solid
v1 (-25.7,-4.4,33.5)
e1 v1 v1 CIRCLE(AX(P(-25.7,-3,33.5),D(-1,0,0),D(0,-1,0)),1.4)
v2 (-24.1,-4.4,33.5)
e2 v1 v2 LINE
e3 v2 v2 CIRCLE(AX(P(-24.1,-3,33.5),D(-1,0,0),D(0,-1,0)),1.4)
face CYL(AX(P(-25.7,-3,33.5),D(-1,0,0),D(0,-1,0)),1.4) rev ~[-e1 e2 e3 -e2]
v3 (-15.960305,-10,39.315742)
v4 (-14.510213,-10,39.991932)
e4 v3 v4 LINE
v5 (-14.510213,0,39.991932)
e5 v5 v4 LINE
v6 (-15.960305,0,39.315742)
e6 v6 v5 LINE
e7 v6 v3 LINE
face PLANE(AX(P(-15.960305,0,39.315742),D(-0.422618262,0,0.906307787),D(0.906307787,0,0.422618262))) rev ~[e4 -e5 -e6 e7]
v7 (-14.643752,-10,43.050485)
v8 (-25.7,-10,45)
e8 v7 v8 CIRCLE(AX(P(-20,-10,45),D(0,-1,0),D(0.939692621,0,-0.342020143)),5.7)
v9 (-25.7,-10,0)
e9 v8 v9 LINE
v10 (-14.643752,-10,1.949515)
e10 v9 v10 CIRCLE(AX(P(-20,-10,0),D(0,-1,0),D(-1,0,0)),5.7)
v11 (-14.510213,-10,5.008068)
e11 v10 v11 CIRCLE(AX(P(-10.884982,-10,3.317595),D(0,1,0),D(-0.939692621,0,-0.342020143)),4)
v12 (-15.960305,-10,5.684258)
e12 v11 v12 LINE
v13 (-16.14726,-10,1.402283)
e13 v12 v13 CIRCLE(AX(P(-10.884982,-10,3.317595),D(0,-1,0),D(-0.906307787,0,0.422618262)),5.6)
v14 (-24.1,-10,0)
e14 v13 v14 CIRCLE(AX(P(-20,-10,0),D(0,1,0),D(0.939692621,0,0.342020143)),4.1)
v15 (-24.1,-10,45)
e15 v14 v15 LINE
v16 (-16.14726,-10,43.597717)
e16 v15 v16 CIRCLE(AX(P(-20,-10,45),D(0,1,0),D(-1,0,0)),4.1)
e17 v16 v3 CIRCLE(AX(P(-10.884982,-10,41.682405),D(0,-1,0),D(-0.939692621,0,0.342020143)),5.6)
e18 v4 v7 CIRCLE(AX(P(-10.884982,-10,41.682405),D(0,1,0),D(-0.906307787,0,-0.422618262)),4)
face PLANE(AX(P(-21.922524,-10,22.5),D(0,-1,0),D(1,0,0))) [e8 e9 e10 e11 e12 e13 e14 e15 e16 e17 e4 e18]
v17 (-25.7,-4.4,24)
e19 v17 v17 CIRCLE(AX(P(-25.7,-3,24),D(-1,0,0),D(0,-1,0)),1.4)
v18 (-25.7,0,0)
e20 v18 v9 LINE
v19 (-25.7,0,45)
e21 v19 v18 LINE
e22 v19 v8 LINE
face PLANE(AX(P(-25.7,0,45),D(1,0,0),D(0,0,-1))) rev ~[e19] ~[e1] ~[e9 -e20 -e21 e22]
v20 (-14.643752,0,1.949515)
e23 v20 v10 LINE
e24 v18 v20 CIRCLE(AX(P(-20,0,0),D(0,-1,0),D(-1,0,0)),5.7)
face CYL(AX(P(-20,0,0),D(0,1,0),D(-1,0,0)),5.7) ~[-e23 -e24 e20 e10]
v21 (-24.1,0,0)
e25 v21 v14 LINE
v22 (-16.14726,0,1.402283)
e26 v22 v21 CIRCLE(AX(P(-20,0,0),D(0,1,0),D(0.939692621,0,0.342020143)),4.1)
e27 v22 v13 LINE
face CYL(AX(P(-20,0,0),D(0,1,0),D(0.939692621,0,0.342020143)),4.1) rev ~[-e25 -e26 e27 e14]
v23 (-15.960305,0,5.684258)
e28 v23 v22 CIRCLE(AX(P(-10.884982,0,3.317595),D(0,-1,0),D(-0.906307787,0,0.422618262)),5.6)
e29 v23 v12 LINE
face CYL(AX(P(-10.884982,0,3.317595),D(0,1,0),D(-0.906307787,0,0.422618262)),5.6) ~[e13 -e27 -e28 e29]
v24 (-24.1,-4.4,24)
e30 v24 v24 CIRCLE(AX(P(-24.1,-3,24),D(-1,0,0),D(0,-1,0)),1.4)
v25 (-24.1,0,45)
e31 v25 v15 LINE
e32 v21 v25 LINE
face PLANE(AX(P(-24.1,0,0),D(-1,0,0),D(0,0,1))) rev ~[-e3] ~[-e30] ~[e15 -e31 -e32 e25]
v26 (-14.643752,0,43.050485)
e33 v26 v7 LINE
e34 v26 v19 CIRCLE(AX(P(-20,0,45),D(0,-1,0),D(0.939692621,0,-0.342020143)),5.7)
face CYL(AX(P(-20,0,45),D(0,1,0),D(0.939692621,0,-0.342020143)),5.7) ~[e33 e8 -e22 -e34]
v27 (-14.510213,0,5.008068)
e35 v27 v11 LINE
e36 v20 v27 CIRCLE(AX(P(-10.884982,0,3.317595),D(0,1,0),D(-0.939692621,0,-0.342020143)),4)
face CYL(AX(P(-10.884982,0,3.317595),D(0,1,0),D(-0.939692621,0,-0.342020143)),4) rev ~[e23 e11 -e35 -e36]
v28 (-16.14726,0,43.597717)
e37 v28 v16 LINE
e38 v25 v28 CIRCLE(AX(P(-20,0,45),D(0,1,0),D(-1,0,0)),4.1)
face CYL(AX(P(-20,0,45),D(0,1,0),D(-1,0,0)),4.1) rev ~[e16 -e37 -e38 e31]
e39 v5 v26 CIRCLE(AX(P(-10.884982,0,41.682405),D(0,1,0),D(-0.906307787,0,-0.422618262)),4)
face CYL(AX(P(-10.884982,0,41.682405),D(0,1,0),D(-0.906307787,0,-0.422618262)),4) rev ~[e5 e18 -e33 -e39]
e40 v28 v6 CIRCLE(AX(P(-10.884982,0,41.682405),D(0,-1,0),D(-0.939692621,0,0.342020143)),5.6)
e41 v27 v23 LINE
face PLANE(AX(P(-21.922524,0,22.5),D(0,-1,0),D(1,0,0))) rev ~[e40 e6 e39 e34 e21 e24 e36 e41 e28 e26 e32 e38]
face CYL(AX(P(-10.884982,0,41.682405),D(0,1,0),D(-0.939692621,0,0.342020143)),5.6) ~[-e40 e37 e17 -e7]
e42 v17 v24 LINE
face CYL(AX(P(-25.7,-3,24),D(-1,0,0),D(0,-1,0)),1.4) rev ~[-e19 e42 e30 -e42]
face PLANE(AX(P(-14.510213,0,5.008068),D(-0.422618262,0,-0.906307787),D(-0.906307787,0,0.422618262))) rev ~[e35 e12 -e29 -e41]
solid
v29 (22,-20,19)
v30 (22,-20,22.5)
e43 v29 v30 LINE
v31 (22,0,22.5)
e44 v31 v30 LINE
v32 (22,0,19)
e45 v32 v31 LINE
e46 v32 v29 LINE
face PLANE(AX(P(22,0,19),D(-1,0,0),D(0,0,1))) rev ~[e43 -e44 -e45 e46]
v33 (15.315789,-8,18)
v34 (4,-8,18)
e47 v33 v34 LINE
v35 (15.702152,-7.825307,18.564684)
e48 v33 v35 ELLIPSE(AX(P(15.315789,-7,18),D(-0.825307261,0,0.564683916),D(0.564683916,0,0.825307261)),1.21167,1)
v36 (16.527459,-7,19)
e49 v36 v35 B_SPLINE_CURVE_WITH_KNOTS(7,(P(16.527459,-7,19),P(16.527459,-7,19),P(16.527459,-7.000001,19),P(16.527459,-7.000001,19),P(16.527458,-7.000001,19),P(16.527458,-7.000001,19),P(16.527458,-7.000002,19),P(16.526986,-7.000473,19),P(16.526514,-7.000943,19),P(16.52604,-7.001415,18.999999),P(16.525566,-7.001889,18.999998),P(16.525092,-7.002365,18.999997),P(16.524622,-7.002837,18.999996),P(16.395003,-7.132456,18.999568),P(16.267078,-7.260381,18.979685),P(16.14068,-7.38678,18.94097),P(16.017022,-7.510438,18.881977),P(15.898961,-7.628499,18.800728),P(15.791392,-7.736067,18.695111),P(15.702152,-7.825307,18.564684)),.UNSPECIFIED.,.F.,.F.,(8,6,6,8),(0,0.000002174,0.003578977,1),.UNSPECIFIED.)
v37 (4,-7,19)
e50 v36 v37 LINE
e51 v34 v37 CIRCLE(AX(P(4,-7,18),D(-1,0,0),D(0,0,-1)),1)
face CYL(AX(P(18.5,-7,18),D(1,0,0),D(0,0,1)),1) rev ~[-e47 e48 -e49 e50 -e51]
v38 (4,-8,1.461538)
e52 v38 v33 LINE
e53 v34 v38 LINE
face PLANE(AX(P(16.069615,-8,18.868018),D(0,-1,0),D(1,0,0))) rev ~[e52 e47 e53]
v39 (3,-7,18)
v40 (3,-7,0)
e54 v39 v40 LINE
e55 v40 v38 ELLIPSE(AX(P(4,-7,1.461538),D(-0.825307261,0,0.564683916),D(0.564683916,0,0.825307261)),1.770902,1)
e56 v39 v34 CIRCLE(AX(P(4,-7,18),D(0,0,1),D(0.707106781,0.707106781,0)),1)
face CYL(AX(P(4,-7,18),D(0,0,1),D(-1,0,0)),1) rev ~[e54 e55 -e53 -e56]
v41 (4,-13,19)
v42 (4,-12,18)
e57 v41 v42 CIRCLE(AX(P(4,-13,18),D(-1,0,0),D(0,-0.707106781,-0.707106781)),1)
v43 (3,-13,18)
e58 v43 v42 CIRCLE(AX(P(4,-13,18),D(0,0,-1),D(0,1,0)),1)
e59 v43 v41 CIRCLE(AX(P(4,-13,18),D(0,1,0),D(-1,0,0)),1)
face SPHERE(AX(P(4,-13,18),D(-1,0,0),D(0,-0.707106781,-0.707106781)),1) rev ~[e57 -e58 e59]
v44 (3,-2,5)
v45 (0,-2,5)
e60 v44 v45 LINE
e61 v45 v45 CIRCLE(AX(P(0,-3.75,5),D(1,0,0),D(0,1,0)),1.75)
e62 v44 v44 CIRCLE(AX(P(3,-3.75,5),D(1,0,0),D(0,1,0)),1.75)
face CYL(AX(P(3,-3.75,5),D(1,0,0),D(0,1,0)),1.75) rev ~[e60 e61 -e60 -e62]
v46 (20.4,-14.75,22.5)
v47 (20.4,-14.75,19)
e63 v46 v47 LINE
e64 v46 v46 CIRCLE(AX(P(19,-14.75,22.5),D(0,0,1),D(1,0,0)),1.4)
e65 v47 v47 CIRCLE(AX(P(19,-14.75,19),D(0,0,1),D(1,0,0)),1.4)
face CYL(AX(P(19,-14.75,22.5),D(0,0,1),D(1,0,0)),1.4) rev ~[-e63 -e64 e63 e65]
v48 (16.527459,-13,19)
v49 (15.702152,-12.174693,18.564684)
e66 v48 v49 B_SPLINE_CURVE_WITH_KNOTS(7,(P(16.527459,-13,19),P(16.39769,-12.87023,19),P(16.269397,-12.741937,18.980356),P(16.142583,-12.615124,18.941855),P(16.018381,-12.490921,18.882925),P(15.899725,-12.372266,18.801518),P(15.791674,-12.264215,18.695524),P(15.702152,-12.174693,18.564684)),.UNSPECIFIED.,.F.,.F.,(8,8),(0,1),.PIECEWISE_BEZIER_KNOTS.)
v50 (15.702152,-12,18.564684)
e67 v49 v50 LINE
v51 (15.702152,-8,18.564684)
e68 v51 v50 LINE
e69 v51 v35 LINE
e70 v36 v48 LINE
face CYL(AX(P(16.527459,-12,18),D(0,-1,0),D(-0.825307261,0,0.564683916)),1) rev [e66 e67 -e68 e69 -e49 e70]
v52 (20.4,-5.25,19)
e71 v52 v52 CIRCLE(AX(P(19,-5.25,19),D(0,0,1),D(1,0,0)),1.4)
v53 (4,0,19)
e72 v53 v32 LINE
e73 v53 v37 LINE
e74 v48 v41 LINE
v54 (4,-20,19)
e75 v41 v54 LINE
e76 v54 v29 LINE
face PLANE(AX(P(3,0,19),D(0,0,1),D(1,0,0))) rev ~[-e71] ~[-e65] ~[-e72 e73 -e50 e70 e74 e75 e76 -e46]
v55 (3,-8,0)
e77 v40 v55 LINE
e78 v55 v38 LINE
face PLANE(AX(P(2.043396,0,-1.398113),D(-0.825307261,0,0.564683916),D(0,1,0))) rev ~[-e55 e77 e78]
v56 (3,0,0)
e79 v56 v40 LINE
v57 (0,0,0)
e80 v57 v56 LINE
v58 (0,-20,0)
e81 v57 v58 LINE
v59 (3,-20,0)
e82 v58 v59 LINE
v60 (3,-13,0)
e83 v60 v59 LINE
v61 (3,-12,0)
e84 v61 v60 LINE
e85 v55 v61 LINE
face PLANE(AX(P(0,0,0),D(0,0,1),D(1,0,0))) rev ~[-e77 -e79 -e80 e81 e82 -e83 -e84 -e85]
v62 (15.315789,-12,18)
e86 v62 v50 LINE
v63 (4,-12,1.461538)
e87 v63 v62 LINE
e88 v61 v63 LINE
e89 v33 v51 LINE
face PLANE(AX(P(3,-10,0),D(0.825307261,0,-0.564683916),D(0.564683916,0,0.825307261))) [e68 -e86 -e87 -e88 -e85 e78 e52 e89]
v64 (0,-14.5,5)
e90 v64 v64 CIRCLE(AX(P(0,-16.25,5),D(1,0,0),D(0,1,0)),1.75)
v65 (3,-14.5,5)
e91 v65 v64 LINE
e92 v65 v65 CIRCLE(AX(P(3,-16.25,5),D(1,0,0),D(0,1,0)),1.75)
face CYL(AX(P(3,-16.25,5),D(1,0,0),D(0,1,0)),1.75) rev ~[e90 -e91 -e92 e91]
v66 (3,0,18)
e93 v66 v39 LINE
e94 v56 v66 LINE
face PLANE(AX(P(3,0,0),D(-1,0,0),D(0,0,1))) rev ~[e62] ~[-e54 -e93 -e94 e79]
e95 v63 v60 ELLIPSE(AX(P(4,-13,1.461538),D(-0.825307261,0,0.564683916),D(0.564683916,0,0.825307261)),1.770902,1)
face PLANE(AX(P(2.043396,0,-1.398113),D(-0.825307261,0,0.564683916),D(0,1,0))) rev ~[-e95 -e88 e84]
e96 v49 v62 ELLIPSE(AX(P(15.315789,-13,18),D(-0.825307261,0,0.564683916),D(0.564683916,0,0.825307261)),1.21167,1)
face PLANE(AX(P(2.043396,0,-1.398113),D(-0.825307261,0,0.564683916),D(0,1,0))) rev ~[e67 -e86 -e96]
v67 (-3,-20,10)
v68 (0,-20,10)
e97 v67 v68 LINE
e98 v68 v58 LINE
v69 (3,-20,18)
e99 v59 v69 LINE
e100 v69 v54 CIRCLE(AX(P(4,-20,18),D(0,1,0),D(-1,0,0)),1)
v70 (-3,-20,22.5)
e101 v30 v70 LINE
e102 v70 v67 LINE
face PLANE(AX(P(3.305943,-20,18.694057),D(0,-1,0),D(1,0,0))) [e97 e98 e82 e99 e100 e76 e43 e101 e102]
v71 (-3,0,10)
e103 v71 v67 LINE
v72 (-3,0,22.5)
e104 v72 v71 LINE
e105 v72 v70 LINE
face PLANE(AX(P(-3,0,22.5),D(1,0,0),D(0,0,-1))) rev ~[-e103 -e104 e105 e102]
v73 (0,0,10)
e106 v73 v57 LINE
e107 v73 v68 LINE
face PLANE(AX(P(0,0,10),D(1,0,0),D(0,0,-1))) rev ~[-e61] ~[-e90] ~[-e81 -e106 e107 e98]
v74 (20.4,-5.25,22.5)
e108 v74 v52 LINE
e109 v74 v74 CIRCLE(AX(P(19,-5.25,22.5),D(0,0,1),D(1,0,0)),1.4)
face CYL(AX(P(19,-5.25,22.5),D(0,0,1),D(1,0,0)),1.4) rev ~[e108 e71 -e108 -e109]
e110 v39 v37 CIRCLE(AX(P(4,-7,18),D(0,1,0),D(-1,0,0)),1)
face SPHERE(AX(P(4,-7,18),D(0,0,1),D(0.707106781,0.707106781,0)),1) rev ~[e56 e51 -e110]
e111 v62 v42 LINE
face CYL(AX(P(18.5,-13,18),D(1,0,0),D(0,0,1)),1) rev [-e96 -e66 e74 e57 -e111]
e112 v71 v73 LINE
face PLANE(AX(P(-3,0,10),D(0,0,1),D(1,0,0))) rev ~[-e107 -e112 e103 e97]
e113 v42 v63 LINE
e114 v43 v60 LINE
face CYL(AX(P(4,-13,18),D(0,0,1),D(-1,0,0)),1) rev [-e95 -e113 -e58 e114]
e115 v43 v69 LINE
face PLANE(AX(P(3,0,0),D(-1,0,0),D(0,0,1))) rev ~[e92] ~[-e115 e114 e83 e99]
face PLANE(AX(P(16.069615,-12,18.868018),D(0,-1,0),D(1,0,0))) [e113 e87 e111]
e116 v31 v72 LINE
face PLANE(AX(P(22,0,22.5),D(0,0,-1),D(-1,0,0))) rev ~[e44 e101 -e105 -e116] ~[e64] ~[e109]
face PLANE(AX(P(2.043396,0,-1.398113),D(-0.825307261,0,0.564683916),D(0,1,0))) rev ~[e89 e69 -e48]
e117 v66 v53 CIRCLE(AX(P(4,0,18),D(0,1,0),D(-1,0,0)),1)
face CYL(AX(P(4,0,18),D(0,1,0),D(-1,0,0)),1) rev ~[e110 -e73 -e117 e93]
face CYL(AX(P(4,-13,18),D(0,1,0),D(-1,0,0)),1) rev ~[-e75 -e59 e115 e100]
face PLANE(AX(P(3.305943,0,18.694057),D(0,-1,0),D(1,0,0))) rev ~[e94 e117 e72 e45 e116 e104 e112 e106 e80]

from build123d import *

# Parameters (mm, degrees)
F1_DEPTH      = 10
F2_R          = 1.4
F3_DEPTH      = 11.401
F5_DEPTH      = 20
F6_R          = 1.4
F7_DEPTH      = 28.201
F11_DEPTH     = 2
F12_T1_DEPTH  = 7
F12_T3_DEPTH  = 7
F12_T5_DEPTH  = 4
F12_S9_W      = 1
F12_S9_H      = 1
F12_T10_DEPTH = 1
F12_S15_W     = 1
F12_S15_H     = 1
F12_T16_DEPTH = 1
F12_T22_DEPTH = 14.5
F12_T27_DEPTH = 18
F12_T32_DEPTH = 14.5
F12_T37_DEPTH = 18
F12_T43_DEPTH = 5.3186485351
F12_T47_DEPTH = 14.5
F12_T54_DEPTH = 5.3186485351
F12_T58_DEPTH = 14.5
F13_R         = 1.75
F14_DEPTH     = 28.701


# Not quite as in the source:
# - a fillet or chamfer that OpenCascade refuses, or shapes differently, is made with other operations: its cross-section is extruded or revolved along the edge and cut away or added


with BuildPart() as f1:
    # F0 (on Front) → F1 (new body)
    with BuildSketch(Plane.XZ):
        with BuildLine():
            ThreePointArc((-14.6437520615, 43.050485183), (-19.0102053873, 50.6134041922), (-25.7, 45))
            Line((-25.7, 45), (-25.7, 0))
            ThreePointArc((-25.7, 0), (-19.0102053873, -5.6134041922), (-14.6437520615, 1.949514817))
            ThreePointArc((-14.6437520615, 1.949514817), (-14.8811744647, 3.4920729397), (-14.5102127265, 5.0080684372))
            Line((-14.5102127265, 5.0080684372), (-15.9603051858, 5.684257656))
            ThreePointArc((-15.9603051858, 5.684257656), (-16.4796516192, 3.5618639595), (-16.1472602548, 1.4022825876))
            ThreePointArc((-16.1472602548, 1.4022825876), (-19.2880424716, -4.0377117874), (-24.1, 0))
            Line((-24.1, 0), (-24.1, 45))
            ThreePointArc((-24.1, 45), (-19.2880424716, 49.0377117874), (-16.1472602548, 43.5977174124))
            ThreePointArc((-16.1472602548, 43.5977174124), (-16.4796516192, 41.4381360405), (-15.9603051858, 39.315742344))
            Line((-15.9603051858, 39.315742344), (-14.5102127265, 39.9919315628))
            ThreePointArc((-14.5102127265, 39.9919315628), (-14.8811744647, 41.5079270603), (-14.6437520615, 43.050485183))
        make_face()
    extrude(amount=F1_DEPTH)

    # F2 (on face) → F3 (cut, through all)
    with BuildSketch(Plane(origin=(-25.7, 0, 0), x_dir=(0, -1, 0), z_dir=(-1, 0, 0))):
        with Locations((3, 33.5)):
            Circle(F2_R)
        with Locations((3, 24)):
            Circle(F2_R)
    extrude(amount=-F3_DEPTH, mode=Mode.SUBTRACT)


with BuildPart() as f5:
    # F4 (on Front) → F5 (new body)
    with BuildSketch(Plane.XZ):
        Polygon((0, 10), (0, 0), (3, 0), (3, 19), (22, 19), (22, 22.5), (-3, 22.5), (-3, 10), align=None)
    extrude(amount=F5_DEPTH)

    # F6 (on face) → F7 (cut, through all)
    with BuildSketch(Plane.XY.offset(22.5)):
        with Locations((19, -5.25)):
            Circle(F6_R)
        with Locations((19, -14.75)):
            Circle(F6_R)
    extrude(amount=-F7_DEPTH, mode=Mode.SUBTRACT)

    # F10 (on plane+point) → F11 (join, symmetric)
    with BuildSketch(Plane.XZ.offset(10)):
        Polygon((3, 19), (3, 0), (16, 19), align=None)
    extrude(amount=F11_DEPTH, both=True)

    # F12: fillet of radius 1 on 7 edges, made by hand

    # F12_s2 → F12_t1 (join)
    with BuildSketch(Plane.XZ.offset(13)):
        with BuildLine():
            ThreePointArc((3, 18), (3.2928932188, 18.7071067812), (4, 19))
            Line((4, 19), (3, 19))
            Line((3, 19), (3, 18))
        make_face()
    extrude(amount=F12_T1_DEPTH)

    # F12_s4 → F12_t3 (join)
    with BuildSketch(Plane.XZ):
        with BuildLine():
            ThreePointArc((3, 18), (3.2928932188, 18.7071067812), (4, 19))
            Line((4, 19), (3, 19))
            Line((3, 19), (3, 18))
        make_face()
    extrude(amount=F12_T3_DEPTH)

    # F12_s6 → F12_t5 (join)
    with BuildSketch(Plane.XZ.offset(8)):
        with BuildLine():
            ThreePointArc((15.7021521528, 18.5646839156), (16.0609210531, 18.8845009654), (16.527459414, 19))
            Line((16.527459414, 19), (16, 19))
            Line((16, 19), (15.7021521528, 18.5646839156))
        make_face()
    extrude(amount=F12_T5_DEPTH)


with BuildPart() as f12_tool8:
    # F12_s9 → F12_t10 (new body)
    with BuildSketch(Plane.YZ.offset(4)):
        with Locations((-12.5, 18.5)):
            Rectangle(F12_S9_W, F12_S9_H)
    extrude(amount=-F12_T10_DEPTH)

    # F12_s11 → F12_t12 (revolve, cut)
    with BuildSketch(Plane(origin=(4, -13, 18), x_dir=(0, -0.7071067812, -0.7071067812), z_dir=(0, 0.7071067812, -0.7071067812))):
        with BuildLine():
            ThreePointArc((0, -1), (1, 0), (0, 1))
            Line((0, 1), (0, -1))
        make_face()
    revolve(axis=Axis((4, -13, 18), (-1, 0, 0)), mode=Mode.SUBTRACT)


with BuildPart() as f5_1:
    add(f5.part)

    # F12_t7: union F12_tool8
    add(f12_tool8.part)


with BuildPart() as f12_tool14:
    # F12_s15 → F12_t16 (new body)
    with BuildSketch(Plane.XY.offset(18)):
        with Locations((3.5, -7.5)):
            Rectangle(F12_S15_W, F12_S15_H)
    extrude(amount=F12_T16_DEPTH)

    # F12_s17 → F12_t18 (revolve, cut)
    with BuildSketch(Plane(origin=(4, -7, 18), x_dir=(0.7071067812, 0.7071067812, 0), z_dir=(0.7071067812, -0.7071067812, 0))):
        with BuildLine():
            ThreePointArc((0, -1), (1, 0), (0, 1))
            Line((0, 1), (0, -1))
        make_face()
    revolve(axis=Axis((4, -7, 18), (0, 0, 1)), mode=Mode.SUBTRACT)


with BuildPart() as f5_2:
    add(f5_1.part)

    # F12_t13: union F12_tool14
    add(f12_tool14.part)


with BuildPart() as f12_tool20:
    # F12_s21 → F12_t22 (new body)
    with BuildSketch(Plane.YZ.offset(18.5)):
        with BuildLine():
            ThreePointArc((-13, 19), (-12.2928932188, 18.7071067812), (-12, 18))
            Line((-12, 18), (-12, 19))
            Line((-12, 19), (-13, 19))
        make_face()
    extrude(amount=-F12_T22_DEPTH)

    split(bisect_by=Plane(origin=(2.0433962264, 0, -1.3981132075), x_dir=(0, 1, 0), z_dir=(-0.8253072612, 0, 0.5646839156)), keep=Keep.TOP)


with BuildPart() as f5_3:
    add(f5_2.part)

    # F12_t19: union F12_tool20
    add(f12_tool20.part)


with BuildPart() as f12_tool25:
    # F12_s26 → F12_t27 (new body)
    with BuildSketch(Plane.XY.offset(18)):
        with BuildLine():
            ThreePointArc((3, -13), (3.2928932188, -12.2928932188), (4, -12))
            Line((4, -12), (3, -12))
            Line((3, -12), (3, -13))
        make_face()
    extrude(amount=-F12_T27_DEPTH)

    split(bisect_by=Plane(origin=(2.0433962264, 0, -1.3981132075), x_dir=(0, 1, 0), z_dir=(-0.8253072612, 0, 0.5646839156)), keep=Keep.TOP)


with BuildPart() as f5_4:
    add(f5_3.part)

    # F12_t24: union F12_tool25
    add(f12_tool25.part)


with BuildPart() as f12_tool30:
    # F12_s31 → F12_t32 (new body)
    with BuildSketch(Plane.YZ.offset(18.5)):
        with BuildLine():
            ThreePointArc((-7, 19), (-7.7071067812, 18.7071067812), (-8, 18))
            Line((-8, 18), (-8, 19))
            Line((-8, 19), (-7, 19))
        make_face()
    extrude(amount=-F12_T32_DEPTH)

    split(bisect_by=Plane(origin=(2.0433962264, 0, -1.3981132075), x_dir=(0, 1, 0), z_dir=(-0.8253072612, 0, 0.5646839156)), keep=Keep.TOP)


with BuildPart() as f5_5:
    add(f5_4.part)

    # F12_t29: union F12_tool30
    add(f12_tool30.part)


with BuildPart() as f12_tool35:
    # F12_s36 → F12_t37 (new body)
    with BuildSketch(Plane.XY.offset(18)):
        with BuildLine():
            ThreePointArc((3, -7), (3.2928932188, -7.7071067812), (4, -8))
            Line((4, -8), (3, -8))
            Line((3, -8), (3, -7))
        make_face()
    extrude(amount=-F12_T37_DEPTH)

    split(bisect_by=Plane(origin=(2.0433962264, 0, -1.3981132075), x_dir=(0, 1, 0), z_dir=(-0.8253072612, 0, 0.5646839156)), keep=Keep.TOP)


with BuildPart() as f5_6:
    add(f5_5.part)

    # F12_t34: union F12_tool35
    add(f12_tool35.part)


with BuildPart() as f12_tool41:
    # F12_s42 → F12_t43 (new body)
    with BuildSketch(Plane.XZ.offset(13.3186485351)):
        with BuildLine():
            ThreePointArc((15.7021521528, 18.5646839156), (16.0609210531, 18.8845009654), (16.527459414, 19))
            Line((16.527459414, 19), (16, 19))
            Line((16, 19), (15.7021521528, 18.5646839156))
        make_face()
    extrude(amount=-F12_T43_DEPTH)

    split(bisect_by=Plane.XZ.offset(12), keep=Keep.TOP)


with BuildPart() as f12_tool45:
    # F12_s46 → F12_t47 (new body)
    with BuildSketch(Plane.YZ.offset(18.5)):
        with BuildLine():
            ThreePointArc((-13, 19), (-12.2928932188, 18.7071067812), (-12, 18))
            Line((-12, 18), (-12, 19))
            Line((-12, 19), (-13, 19))
        make_face()
    extrude(amount=-F12_T47_DEPTH)

    split(bisect_by=Plane(origin=(2.0433962264, 0, -1.3981132075), x_dir=(0, 1, 0), z_dir=(0.8253072612, 0, -0.5646839156)), keep=Keep.TOP)


with BuildPart() as f12_tool41_1:
    add(f12_tool41.part)

    # F12_t49: intersect F12_tool45
    add(f12_tool45.part, mode=Mode.INTERSECT)


with BuildPart() as f5_7:
    add(f5_6.part)

    # F12_t39: union F12_tool41
    add(f12_tool41_1.part)


with BuildPart() as f12_tool52:
    # F12_s53 → F12_t54 (new body)
    with BuildSketch(Plane.XZ.offset(12)):
        with BuildLine():
            ThreePointArc((15.7021521528, 18.5646839156), (16.0609210531, 18.8845009654), (16.527459414, 19))
            Line((16.527459414, 19), (16, 19))
            Line((16, 19), (15.7021521528, 18.5646839156))
        make_face()
    extrude(amount=-F12_T54_DEPTH)

    split(bisect_by=Plane.XZ.offset(8), keep=Keep.BOTTOM)


with BuildPart() as f12_tool56:
    # F12_s57 → F12_t58 (new body)
    with BuildSketch(Plane.YZ.offset(18.5)):
        with BuildLine():
            ThreePointArc((-7, 19), (-7.7071067812, 18.7071067812), (-8, 18))
            Line((-8, 18), (-8, 19))
            Line((-8, 19), (-7, 19))
        make_face()
    extrude(amount=-F12_T58_DEPTH)

    split(bisect_by=Plane(origin=(2.0433962264, 0, -1.3981132075), x_dir=(0, 1, 0), z_dir=(0.8253072612, 0, -0.5646839156)), keep=Keep.TOP)


with BuildPart() as f12_tool52_1:
    add(f12_tool52.part)

    # F12_t60: intersect F12_tool56
    add(f12_tool56.part, mode=Mode.INTERSECT)


with BuildPart() as f5_8:
    add(f5_7.part)

    # F12_t50: union F12_tool52
    add(f12_tool52_1.part)

    # F13 (on face) → F14 (cut, through all)
    with BuildSketch(Plane.YZ.offset(3)):
        with Locations((-16.25, 5)):
            Circle(F13_R)
        with Locations((-3.75, 5)):
            Circle(F13_R)
    extrude(amount=-F14_DEPTH, mode=Mode.SUBTRACT)


solid = Compound([f1.part, f5_8.part])
